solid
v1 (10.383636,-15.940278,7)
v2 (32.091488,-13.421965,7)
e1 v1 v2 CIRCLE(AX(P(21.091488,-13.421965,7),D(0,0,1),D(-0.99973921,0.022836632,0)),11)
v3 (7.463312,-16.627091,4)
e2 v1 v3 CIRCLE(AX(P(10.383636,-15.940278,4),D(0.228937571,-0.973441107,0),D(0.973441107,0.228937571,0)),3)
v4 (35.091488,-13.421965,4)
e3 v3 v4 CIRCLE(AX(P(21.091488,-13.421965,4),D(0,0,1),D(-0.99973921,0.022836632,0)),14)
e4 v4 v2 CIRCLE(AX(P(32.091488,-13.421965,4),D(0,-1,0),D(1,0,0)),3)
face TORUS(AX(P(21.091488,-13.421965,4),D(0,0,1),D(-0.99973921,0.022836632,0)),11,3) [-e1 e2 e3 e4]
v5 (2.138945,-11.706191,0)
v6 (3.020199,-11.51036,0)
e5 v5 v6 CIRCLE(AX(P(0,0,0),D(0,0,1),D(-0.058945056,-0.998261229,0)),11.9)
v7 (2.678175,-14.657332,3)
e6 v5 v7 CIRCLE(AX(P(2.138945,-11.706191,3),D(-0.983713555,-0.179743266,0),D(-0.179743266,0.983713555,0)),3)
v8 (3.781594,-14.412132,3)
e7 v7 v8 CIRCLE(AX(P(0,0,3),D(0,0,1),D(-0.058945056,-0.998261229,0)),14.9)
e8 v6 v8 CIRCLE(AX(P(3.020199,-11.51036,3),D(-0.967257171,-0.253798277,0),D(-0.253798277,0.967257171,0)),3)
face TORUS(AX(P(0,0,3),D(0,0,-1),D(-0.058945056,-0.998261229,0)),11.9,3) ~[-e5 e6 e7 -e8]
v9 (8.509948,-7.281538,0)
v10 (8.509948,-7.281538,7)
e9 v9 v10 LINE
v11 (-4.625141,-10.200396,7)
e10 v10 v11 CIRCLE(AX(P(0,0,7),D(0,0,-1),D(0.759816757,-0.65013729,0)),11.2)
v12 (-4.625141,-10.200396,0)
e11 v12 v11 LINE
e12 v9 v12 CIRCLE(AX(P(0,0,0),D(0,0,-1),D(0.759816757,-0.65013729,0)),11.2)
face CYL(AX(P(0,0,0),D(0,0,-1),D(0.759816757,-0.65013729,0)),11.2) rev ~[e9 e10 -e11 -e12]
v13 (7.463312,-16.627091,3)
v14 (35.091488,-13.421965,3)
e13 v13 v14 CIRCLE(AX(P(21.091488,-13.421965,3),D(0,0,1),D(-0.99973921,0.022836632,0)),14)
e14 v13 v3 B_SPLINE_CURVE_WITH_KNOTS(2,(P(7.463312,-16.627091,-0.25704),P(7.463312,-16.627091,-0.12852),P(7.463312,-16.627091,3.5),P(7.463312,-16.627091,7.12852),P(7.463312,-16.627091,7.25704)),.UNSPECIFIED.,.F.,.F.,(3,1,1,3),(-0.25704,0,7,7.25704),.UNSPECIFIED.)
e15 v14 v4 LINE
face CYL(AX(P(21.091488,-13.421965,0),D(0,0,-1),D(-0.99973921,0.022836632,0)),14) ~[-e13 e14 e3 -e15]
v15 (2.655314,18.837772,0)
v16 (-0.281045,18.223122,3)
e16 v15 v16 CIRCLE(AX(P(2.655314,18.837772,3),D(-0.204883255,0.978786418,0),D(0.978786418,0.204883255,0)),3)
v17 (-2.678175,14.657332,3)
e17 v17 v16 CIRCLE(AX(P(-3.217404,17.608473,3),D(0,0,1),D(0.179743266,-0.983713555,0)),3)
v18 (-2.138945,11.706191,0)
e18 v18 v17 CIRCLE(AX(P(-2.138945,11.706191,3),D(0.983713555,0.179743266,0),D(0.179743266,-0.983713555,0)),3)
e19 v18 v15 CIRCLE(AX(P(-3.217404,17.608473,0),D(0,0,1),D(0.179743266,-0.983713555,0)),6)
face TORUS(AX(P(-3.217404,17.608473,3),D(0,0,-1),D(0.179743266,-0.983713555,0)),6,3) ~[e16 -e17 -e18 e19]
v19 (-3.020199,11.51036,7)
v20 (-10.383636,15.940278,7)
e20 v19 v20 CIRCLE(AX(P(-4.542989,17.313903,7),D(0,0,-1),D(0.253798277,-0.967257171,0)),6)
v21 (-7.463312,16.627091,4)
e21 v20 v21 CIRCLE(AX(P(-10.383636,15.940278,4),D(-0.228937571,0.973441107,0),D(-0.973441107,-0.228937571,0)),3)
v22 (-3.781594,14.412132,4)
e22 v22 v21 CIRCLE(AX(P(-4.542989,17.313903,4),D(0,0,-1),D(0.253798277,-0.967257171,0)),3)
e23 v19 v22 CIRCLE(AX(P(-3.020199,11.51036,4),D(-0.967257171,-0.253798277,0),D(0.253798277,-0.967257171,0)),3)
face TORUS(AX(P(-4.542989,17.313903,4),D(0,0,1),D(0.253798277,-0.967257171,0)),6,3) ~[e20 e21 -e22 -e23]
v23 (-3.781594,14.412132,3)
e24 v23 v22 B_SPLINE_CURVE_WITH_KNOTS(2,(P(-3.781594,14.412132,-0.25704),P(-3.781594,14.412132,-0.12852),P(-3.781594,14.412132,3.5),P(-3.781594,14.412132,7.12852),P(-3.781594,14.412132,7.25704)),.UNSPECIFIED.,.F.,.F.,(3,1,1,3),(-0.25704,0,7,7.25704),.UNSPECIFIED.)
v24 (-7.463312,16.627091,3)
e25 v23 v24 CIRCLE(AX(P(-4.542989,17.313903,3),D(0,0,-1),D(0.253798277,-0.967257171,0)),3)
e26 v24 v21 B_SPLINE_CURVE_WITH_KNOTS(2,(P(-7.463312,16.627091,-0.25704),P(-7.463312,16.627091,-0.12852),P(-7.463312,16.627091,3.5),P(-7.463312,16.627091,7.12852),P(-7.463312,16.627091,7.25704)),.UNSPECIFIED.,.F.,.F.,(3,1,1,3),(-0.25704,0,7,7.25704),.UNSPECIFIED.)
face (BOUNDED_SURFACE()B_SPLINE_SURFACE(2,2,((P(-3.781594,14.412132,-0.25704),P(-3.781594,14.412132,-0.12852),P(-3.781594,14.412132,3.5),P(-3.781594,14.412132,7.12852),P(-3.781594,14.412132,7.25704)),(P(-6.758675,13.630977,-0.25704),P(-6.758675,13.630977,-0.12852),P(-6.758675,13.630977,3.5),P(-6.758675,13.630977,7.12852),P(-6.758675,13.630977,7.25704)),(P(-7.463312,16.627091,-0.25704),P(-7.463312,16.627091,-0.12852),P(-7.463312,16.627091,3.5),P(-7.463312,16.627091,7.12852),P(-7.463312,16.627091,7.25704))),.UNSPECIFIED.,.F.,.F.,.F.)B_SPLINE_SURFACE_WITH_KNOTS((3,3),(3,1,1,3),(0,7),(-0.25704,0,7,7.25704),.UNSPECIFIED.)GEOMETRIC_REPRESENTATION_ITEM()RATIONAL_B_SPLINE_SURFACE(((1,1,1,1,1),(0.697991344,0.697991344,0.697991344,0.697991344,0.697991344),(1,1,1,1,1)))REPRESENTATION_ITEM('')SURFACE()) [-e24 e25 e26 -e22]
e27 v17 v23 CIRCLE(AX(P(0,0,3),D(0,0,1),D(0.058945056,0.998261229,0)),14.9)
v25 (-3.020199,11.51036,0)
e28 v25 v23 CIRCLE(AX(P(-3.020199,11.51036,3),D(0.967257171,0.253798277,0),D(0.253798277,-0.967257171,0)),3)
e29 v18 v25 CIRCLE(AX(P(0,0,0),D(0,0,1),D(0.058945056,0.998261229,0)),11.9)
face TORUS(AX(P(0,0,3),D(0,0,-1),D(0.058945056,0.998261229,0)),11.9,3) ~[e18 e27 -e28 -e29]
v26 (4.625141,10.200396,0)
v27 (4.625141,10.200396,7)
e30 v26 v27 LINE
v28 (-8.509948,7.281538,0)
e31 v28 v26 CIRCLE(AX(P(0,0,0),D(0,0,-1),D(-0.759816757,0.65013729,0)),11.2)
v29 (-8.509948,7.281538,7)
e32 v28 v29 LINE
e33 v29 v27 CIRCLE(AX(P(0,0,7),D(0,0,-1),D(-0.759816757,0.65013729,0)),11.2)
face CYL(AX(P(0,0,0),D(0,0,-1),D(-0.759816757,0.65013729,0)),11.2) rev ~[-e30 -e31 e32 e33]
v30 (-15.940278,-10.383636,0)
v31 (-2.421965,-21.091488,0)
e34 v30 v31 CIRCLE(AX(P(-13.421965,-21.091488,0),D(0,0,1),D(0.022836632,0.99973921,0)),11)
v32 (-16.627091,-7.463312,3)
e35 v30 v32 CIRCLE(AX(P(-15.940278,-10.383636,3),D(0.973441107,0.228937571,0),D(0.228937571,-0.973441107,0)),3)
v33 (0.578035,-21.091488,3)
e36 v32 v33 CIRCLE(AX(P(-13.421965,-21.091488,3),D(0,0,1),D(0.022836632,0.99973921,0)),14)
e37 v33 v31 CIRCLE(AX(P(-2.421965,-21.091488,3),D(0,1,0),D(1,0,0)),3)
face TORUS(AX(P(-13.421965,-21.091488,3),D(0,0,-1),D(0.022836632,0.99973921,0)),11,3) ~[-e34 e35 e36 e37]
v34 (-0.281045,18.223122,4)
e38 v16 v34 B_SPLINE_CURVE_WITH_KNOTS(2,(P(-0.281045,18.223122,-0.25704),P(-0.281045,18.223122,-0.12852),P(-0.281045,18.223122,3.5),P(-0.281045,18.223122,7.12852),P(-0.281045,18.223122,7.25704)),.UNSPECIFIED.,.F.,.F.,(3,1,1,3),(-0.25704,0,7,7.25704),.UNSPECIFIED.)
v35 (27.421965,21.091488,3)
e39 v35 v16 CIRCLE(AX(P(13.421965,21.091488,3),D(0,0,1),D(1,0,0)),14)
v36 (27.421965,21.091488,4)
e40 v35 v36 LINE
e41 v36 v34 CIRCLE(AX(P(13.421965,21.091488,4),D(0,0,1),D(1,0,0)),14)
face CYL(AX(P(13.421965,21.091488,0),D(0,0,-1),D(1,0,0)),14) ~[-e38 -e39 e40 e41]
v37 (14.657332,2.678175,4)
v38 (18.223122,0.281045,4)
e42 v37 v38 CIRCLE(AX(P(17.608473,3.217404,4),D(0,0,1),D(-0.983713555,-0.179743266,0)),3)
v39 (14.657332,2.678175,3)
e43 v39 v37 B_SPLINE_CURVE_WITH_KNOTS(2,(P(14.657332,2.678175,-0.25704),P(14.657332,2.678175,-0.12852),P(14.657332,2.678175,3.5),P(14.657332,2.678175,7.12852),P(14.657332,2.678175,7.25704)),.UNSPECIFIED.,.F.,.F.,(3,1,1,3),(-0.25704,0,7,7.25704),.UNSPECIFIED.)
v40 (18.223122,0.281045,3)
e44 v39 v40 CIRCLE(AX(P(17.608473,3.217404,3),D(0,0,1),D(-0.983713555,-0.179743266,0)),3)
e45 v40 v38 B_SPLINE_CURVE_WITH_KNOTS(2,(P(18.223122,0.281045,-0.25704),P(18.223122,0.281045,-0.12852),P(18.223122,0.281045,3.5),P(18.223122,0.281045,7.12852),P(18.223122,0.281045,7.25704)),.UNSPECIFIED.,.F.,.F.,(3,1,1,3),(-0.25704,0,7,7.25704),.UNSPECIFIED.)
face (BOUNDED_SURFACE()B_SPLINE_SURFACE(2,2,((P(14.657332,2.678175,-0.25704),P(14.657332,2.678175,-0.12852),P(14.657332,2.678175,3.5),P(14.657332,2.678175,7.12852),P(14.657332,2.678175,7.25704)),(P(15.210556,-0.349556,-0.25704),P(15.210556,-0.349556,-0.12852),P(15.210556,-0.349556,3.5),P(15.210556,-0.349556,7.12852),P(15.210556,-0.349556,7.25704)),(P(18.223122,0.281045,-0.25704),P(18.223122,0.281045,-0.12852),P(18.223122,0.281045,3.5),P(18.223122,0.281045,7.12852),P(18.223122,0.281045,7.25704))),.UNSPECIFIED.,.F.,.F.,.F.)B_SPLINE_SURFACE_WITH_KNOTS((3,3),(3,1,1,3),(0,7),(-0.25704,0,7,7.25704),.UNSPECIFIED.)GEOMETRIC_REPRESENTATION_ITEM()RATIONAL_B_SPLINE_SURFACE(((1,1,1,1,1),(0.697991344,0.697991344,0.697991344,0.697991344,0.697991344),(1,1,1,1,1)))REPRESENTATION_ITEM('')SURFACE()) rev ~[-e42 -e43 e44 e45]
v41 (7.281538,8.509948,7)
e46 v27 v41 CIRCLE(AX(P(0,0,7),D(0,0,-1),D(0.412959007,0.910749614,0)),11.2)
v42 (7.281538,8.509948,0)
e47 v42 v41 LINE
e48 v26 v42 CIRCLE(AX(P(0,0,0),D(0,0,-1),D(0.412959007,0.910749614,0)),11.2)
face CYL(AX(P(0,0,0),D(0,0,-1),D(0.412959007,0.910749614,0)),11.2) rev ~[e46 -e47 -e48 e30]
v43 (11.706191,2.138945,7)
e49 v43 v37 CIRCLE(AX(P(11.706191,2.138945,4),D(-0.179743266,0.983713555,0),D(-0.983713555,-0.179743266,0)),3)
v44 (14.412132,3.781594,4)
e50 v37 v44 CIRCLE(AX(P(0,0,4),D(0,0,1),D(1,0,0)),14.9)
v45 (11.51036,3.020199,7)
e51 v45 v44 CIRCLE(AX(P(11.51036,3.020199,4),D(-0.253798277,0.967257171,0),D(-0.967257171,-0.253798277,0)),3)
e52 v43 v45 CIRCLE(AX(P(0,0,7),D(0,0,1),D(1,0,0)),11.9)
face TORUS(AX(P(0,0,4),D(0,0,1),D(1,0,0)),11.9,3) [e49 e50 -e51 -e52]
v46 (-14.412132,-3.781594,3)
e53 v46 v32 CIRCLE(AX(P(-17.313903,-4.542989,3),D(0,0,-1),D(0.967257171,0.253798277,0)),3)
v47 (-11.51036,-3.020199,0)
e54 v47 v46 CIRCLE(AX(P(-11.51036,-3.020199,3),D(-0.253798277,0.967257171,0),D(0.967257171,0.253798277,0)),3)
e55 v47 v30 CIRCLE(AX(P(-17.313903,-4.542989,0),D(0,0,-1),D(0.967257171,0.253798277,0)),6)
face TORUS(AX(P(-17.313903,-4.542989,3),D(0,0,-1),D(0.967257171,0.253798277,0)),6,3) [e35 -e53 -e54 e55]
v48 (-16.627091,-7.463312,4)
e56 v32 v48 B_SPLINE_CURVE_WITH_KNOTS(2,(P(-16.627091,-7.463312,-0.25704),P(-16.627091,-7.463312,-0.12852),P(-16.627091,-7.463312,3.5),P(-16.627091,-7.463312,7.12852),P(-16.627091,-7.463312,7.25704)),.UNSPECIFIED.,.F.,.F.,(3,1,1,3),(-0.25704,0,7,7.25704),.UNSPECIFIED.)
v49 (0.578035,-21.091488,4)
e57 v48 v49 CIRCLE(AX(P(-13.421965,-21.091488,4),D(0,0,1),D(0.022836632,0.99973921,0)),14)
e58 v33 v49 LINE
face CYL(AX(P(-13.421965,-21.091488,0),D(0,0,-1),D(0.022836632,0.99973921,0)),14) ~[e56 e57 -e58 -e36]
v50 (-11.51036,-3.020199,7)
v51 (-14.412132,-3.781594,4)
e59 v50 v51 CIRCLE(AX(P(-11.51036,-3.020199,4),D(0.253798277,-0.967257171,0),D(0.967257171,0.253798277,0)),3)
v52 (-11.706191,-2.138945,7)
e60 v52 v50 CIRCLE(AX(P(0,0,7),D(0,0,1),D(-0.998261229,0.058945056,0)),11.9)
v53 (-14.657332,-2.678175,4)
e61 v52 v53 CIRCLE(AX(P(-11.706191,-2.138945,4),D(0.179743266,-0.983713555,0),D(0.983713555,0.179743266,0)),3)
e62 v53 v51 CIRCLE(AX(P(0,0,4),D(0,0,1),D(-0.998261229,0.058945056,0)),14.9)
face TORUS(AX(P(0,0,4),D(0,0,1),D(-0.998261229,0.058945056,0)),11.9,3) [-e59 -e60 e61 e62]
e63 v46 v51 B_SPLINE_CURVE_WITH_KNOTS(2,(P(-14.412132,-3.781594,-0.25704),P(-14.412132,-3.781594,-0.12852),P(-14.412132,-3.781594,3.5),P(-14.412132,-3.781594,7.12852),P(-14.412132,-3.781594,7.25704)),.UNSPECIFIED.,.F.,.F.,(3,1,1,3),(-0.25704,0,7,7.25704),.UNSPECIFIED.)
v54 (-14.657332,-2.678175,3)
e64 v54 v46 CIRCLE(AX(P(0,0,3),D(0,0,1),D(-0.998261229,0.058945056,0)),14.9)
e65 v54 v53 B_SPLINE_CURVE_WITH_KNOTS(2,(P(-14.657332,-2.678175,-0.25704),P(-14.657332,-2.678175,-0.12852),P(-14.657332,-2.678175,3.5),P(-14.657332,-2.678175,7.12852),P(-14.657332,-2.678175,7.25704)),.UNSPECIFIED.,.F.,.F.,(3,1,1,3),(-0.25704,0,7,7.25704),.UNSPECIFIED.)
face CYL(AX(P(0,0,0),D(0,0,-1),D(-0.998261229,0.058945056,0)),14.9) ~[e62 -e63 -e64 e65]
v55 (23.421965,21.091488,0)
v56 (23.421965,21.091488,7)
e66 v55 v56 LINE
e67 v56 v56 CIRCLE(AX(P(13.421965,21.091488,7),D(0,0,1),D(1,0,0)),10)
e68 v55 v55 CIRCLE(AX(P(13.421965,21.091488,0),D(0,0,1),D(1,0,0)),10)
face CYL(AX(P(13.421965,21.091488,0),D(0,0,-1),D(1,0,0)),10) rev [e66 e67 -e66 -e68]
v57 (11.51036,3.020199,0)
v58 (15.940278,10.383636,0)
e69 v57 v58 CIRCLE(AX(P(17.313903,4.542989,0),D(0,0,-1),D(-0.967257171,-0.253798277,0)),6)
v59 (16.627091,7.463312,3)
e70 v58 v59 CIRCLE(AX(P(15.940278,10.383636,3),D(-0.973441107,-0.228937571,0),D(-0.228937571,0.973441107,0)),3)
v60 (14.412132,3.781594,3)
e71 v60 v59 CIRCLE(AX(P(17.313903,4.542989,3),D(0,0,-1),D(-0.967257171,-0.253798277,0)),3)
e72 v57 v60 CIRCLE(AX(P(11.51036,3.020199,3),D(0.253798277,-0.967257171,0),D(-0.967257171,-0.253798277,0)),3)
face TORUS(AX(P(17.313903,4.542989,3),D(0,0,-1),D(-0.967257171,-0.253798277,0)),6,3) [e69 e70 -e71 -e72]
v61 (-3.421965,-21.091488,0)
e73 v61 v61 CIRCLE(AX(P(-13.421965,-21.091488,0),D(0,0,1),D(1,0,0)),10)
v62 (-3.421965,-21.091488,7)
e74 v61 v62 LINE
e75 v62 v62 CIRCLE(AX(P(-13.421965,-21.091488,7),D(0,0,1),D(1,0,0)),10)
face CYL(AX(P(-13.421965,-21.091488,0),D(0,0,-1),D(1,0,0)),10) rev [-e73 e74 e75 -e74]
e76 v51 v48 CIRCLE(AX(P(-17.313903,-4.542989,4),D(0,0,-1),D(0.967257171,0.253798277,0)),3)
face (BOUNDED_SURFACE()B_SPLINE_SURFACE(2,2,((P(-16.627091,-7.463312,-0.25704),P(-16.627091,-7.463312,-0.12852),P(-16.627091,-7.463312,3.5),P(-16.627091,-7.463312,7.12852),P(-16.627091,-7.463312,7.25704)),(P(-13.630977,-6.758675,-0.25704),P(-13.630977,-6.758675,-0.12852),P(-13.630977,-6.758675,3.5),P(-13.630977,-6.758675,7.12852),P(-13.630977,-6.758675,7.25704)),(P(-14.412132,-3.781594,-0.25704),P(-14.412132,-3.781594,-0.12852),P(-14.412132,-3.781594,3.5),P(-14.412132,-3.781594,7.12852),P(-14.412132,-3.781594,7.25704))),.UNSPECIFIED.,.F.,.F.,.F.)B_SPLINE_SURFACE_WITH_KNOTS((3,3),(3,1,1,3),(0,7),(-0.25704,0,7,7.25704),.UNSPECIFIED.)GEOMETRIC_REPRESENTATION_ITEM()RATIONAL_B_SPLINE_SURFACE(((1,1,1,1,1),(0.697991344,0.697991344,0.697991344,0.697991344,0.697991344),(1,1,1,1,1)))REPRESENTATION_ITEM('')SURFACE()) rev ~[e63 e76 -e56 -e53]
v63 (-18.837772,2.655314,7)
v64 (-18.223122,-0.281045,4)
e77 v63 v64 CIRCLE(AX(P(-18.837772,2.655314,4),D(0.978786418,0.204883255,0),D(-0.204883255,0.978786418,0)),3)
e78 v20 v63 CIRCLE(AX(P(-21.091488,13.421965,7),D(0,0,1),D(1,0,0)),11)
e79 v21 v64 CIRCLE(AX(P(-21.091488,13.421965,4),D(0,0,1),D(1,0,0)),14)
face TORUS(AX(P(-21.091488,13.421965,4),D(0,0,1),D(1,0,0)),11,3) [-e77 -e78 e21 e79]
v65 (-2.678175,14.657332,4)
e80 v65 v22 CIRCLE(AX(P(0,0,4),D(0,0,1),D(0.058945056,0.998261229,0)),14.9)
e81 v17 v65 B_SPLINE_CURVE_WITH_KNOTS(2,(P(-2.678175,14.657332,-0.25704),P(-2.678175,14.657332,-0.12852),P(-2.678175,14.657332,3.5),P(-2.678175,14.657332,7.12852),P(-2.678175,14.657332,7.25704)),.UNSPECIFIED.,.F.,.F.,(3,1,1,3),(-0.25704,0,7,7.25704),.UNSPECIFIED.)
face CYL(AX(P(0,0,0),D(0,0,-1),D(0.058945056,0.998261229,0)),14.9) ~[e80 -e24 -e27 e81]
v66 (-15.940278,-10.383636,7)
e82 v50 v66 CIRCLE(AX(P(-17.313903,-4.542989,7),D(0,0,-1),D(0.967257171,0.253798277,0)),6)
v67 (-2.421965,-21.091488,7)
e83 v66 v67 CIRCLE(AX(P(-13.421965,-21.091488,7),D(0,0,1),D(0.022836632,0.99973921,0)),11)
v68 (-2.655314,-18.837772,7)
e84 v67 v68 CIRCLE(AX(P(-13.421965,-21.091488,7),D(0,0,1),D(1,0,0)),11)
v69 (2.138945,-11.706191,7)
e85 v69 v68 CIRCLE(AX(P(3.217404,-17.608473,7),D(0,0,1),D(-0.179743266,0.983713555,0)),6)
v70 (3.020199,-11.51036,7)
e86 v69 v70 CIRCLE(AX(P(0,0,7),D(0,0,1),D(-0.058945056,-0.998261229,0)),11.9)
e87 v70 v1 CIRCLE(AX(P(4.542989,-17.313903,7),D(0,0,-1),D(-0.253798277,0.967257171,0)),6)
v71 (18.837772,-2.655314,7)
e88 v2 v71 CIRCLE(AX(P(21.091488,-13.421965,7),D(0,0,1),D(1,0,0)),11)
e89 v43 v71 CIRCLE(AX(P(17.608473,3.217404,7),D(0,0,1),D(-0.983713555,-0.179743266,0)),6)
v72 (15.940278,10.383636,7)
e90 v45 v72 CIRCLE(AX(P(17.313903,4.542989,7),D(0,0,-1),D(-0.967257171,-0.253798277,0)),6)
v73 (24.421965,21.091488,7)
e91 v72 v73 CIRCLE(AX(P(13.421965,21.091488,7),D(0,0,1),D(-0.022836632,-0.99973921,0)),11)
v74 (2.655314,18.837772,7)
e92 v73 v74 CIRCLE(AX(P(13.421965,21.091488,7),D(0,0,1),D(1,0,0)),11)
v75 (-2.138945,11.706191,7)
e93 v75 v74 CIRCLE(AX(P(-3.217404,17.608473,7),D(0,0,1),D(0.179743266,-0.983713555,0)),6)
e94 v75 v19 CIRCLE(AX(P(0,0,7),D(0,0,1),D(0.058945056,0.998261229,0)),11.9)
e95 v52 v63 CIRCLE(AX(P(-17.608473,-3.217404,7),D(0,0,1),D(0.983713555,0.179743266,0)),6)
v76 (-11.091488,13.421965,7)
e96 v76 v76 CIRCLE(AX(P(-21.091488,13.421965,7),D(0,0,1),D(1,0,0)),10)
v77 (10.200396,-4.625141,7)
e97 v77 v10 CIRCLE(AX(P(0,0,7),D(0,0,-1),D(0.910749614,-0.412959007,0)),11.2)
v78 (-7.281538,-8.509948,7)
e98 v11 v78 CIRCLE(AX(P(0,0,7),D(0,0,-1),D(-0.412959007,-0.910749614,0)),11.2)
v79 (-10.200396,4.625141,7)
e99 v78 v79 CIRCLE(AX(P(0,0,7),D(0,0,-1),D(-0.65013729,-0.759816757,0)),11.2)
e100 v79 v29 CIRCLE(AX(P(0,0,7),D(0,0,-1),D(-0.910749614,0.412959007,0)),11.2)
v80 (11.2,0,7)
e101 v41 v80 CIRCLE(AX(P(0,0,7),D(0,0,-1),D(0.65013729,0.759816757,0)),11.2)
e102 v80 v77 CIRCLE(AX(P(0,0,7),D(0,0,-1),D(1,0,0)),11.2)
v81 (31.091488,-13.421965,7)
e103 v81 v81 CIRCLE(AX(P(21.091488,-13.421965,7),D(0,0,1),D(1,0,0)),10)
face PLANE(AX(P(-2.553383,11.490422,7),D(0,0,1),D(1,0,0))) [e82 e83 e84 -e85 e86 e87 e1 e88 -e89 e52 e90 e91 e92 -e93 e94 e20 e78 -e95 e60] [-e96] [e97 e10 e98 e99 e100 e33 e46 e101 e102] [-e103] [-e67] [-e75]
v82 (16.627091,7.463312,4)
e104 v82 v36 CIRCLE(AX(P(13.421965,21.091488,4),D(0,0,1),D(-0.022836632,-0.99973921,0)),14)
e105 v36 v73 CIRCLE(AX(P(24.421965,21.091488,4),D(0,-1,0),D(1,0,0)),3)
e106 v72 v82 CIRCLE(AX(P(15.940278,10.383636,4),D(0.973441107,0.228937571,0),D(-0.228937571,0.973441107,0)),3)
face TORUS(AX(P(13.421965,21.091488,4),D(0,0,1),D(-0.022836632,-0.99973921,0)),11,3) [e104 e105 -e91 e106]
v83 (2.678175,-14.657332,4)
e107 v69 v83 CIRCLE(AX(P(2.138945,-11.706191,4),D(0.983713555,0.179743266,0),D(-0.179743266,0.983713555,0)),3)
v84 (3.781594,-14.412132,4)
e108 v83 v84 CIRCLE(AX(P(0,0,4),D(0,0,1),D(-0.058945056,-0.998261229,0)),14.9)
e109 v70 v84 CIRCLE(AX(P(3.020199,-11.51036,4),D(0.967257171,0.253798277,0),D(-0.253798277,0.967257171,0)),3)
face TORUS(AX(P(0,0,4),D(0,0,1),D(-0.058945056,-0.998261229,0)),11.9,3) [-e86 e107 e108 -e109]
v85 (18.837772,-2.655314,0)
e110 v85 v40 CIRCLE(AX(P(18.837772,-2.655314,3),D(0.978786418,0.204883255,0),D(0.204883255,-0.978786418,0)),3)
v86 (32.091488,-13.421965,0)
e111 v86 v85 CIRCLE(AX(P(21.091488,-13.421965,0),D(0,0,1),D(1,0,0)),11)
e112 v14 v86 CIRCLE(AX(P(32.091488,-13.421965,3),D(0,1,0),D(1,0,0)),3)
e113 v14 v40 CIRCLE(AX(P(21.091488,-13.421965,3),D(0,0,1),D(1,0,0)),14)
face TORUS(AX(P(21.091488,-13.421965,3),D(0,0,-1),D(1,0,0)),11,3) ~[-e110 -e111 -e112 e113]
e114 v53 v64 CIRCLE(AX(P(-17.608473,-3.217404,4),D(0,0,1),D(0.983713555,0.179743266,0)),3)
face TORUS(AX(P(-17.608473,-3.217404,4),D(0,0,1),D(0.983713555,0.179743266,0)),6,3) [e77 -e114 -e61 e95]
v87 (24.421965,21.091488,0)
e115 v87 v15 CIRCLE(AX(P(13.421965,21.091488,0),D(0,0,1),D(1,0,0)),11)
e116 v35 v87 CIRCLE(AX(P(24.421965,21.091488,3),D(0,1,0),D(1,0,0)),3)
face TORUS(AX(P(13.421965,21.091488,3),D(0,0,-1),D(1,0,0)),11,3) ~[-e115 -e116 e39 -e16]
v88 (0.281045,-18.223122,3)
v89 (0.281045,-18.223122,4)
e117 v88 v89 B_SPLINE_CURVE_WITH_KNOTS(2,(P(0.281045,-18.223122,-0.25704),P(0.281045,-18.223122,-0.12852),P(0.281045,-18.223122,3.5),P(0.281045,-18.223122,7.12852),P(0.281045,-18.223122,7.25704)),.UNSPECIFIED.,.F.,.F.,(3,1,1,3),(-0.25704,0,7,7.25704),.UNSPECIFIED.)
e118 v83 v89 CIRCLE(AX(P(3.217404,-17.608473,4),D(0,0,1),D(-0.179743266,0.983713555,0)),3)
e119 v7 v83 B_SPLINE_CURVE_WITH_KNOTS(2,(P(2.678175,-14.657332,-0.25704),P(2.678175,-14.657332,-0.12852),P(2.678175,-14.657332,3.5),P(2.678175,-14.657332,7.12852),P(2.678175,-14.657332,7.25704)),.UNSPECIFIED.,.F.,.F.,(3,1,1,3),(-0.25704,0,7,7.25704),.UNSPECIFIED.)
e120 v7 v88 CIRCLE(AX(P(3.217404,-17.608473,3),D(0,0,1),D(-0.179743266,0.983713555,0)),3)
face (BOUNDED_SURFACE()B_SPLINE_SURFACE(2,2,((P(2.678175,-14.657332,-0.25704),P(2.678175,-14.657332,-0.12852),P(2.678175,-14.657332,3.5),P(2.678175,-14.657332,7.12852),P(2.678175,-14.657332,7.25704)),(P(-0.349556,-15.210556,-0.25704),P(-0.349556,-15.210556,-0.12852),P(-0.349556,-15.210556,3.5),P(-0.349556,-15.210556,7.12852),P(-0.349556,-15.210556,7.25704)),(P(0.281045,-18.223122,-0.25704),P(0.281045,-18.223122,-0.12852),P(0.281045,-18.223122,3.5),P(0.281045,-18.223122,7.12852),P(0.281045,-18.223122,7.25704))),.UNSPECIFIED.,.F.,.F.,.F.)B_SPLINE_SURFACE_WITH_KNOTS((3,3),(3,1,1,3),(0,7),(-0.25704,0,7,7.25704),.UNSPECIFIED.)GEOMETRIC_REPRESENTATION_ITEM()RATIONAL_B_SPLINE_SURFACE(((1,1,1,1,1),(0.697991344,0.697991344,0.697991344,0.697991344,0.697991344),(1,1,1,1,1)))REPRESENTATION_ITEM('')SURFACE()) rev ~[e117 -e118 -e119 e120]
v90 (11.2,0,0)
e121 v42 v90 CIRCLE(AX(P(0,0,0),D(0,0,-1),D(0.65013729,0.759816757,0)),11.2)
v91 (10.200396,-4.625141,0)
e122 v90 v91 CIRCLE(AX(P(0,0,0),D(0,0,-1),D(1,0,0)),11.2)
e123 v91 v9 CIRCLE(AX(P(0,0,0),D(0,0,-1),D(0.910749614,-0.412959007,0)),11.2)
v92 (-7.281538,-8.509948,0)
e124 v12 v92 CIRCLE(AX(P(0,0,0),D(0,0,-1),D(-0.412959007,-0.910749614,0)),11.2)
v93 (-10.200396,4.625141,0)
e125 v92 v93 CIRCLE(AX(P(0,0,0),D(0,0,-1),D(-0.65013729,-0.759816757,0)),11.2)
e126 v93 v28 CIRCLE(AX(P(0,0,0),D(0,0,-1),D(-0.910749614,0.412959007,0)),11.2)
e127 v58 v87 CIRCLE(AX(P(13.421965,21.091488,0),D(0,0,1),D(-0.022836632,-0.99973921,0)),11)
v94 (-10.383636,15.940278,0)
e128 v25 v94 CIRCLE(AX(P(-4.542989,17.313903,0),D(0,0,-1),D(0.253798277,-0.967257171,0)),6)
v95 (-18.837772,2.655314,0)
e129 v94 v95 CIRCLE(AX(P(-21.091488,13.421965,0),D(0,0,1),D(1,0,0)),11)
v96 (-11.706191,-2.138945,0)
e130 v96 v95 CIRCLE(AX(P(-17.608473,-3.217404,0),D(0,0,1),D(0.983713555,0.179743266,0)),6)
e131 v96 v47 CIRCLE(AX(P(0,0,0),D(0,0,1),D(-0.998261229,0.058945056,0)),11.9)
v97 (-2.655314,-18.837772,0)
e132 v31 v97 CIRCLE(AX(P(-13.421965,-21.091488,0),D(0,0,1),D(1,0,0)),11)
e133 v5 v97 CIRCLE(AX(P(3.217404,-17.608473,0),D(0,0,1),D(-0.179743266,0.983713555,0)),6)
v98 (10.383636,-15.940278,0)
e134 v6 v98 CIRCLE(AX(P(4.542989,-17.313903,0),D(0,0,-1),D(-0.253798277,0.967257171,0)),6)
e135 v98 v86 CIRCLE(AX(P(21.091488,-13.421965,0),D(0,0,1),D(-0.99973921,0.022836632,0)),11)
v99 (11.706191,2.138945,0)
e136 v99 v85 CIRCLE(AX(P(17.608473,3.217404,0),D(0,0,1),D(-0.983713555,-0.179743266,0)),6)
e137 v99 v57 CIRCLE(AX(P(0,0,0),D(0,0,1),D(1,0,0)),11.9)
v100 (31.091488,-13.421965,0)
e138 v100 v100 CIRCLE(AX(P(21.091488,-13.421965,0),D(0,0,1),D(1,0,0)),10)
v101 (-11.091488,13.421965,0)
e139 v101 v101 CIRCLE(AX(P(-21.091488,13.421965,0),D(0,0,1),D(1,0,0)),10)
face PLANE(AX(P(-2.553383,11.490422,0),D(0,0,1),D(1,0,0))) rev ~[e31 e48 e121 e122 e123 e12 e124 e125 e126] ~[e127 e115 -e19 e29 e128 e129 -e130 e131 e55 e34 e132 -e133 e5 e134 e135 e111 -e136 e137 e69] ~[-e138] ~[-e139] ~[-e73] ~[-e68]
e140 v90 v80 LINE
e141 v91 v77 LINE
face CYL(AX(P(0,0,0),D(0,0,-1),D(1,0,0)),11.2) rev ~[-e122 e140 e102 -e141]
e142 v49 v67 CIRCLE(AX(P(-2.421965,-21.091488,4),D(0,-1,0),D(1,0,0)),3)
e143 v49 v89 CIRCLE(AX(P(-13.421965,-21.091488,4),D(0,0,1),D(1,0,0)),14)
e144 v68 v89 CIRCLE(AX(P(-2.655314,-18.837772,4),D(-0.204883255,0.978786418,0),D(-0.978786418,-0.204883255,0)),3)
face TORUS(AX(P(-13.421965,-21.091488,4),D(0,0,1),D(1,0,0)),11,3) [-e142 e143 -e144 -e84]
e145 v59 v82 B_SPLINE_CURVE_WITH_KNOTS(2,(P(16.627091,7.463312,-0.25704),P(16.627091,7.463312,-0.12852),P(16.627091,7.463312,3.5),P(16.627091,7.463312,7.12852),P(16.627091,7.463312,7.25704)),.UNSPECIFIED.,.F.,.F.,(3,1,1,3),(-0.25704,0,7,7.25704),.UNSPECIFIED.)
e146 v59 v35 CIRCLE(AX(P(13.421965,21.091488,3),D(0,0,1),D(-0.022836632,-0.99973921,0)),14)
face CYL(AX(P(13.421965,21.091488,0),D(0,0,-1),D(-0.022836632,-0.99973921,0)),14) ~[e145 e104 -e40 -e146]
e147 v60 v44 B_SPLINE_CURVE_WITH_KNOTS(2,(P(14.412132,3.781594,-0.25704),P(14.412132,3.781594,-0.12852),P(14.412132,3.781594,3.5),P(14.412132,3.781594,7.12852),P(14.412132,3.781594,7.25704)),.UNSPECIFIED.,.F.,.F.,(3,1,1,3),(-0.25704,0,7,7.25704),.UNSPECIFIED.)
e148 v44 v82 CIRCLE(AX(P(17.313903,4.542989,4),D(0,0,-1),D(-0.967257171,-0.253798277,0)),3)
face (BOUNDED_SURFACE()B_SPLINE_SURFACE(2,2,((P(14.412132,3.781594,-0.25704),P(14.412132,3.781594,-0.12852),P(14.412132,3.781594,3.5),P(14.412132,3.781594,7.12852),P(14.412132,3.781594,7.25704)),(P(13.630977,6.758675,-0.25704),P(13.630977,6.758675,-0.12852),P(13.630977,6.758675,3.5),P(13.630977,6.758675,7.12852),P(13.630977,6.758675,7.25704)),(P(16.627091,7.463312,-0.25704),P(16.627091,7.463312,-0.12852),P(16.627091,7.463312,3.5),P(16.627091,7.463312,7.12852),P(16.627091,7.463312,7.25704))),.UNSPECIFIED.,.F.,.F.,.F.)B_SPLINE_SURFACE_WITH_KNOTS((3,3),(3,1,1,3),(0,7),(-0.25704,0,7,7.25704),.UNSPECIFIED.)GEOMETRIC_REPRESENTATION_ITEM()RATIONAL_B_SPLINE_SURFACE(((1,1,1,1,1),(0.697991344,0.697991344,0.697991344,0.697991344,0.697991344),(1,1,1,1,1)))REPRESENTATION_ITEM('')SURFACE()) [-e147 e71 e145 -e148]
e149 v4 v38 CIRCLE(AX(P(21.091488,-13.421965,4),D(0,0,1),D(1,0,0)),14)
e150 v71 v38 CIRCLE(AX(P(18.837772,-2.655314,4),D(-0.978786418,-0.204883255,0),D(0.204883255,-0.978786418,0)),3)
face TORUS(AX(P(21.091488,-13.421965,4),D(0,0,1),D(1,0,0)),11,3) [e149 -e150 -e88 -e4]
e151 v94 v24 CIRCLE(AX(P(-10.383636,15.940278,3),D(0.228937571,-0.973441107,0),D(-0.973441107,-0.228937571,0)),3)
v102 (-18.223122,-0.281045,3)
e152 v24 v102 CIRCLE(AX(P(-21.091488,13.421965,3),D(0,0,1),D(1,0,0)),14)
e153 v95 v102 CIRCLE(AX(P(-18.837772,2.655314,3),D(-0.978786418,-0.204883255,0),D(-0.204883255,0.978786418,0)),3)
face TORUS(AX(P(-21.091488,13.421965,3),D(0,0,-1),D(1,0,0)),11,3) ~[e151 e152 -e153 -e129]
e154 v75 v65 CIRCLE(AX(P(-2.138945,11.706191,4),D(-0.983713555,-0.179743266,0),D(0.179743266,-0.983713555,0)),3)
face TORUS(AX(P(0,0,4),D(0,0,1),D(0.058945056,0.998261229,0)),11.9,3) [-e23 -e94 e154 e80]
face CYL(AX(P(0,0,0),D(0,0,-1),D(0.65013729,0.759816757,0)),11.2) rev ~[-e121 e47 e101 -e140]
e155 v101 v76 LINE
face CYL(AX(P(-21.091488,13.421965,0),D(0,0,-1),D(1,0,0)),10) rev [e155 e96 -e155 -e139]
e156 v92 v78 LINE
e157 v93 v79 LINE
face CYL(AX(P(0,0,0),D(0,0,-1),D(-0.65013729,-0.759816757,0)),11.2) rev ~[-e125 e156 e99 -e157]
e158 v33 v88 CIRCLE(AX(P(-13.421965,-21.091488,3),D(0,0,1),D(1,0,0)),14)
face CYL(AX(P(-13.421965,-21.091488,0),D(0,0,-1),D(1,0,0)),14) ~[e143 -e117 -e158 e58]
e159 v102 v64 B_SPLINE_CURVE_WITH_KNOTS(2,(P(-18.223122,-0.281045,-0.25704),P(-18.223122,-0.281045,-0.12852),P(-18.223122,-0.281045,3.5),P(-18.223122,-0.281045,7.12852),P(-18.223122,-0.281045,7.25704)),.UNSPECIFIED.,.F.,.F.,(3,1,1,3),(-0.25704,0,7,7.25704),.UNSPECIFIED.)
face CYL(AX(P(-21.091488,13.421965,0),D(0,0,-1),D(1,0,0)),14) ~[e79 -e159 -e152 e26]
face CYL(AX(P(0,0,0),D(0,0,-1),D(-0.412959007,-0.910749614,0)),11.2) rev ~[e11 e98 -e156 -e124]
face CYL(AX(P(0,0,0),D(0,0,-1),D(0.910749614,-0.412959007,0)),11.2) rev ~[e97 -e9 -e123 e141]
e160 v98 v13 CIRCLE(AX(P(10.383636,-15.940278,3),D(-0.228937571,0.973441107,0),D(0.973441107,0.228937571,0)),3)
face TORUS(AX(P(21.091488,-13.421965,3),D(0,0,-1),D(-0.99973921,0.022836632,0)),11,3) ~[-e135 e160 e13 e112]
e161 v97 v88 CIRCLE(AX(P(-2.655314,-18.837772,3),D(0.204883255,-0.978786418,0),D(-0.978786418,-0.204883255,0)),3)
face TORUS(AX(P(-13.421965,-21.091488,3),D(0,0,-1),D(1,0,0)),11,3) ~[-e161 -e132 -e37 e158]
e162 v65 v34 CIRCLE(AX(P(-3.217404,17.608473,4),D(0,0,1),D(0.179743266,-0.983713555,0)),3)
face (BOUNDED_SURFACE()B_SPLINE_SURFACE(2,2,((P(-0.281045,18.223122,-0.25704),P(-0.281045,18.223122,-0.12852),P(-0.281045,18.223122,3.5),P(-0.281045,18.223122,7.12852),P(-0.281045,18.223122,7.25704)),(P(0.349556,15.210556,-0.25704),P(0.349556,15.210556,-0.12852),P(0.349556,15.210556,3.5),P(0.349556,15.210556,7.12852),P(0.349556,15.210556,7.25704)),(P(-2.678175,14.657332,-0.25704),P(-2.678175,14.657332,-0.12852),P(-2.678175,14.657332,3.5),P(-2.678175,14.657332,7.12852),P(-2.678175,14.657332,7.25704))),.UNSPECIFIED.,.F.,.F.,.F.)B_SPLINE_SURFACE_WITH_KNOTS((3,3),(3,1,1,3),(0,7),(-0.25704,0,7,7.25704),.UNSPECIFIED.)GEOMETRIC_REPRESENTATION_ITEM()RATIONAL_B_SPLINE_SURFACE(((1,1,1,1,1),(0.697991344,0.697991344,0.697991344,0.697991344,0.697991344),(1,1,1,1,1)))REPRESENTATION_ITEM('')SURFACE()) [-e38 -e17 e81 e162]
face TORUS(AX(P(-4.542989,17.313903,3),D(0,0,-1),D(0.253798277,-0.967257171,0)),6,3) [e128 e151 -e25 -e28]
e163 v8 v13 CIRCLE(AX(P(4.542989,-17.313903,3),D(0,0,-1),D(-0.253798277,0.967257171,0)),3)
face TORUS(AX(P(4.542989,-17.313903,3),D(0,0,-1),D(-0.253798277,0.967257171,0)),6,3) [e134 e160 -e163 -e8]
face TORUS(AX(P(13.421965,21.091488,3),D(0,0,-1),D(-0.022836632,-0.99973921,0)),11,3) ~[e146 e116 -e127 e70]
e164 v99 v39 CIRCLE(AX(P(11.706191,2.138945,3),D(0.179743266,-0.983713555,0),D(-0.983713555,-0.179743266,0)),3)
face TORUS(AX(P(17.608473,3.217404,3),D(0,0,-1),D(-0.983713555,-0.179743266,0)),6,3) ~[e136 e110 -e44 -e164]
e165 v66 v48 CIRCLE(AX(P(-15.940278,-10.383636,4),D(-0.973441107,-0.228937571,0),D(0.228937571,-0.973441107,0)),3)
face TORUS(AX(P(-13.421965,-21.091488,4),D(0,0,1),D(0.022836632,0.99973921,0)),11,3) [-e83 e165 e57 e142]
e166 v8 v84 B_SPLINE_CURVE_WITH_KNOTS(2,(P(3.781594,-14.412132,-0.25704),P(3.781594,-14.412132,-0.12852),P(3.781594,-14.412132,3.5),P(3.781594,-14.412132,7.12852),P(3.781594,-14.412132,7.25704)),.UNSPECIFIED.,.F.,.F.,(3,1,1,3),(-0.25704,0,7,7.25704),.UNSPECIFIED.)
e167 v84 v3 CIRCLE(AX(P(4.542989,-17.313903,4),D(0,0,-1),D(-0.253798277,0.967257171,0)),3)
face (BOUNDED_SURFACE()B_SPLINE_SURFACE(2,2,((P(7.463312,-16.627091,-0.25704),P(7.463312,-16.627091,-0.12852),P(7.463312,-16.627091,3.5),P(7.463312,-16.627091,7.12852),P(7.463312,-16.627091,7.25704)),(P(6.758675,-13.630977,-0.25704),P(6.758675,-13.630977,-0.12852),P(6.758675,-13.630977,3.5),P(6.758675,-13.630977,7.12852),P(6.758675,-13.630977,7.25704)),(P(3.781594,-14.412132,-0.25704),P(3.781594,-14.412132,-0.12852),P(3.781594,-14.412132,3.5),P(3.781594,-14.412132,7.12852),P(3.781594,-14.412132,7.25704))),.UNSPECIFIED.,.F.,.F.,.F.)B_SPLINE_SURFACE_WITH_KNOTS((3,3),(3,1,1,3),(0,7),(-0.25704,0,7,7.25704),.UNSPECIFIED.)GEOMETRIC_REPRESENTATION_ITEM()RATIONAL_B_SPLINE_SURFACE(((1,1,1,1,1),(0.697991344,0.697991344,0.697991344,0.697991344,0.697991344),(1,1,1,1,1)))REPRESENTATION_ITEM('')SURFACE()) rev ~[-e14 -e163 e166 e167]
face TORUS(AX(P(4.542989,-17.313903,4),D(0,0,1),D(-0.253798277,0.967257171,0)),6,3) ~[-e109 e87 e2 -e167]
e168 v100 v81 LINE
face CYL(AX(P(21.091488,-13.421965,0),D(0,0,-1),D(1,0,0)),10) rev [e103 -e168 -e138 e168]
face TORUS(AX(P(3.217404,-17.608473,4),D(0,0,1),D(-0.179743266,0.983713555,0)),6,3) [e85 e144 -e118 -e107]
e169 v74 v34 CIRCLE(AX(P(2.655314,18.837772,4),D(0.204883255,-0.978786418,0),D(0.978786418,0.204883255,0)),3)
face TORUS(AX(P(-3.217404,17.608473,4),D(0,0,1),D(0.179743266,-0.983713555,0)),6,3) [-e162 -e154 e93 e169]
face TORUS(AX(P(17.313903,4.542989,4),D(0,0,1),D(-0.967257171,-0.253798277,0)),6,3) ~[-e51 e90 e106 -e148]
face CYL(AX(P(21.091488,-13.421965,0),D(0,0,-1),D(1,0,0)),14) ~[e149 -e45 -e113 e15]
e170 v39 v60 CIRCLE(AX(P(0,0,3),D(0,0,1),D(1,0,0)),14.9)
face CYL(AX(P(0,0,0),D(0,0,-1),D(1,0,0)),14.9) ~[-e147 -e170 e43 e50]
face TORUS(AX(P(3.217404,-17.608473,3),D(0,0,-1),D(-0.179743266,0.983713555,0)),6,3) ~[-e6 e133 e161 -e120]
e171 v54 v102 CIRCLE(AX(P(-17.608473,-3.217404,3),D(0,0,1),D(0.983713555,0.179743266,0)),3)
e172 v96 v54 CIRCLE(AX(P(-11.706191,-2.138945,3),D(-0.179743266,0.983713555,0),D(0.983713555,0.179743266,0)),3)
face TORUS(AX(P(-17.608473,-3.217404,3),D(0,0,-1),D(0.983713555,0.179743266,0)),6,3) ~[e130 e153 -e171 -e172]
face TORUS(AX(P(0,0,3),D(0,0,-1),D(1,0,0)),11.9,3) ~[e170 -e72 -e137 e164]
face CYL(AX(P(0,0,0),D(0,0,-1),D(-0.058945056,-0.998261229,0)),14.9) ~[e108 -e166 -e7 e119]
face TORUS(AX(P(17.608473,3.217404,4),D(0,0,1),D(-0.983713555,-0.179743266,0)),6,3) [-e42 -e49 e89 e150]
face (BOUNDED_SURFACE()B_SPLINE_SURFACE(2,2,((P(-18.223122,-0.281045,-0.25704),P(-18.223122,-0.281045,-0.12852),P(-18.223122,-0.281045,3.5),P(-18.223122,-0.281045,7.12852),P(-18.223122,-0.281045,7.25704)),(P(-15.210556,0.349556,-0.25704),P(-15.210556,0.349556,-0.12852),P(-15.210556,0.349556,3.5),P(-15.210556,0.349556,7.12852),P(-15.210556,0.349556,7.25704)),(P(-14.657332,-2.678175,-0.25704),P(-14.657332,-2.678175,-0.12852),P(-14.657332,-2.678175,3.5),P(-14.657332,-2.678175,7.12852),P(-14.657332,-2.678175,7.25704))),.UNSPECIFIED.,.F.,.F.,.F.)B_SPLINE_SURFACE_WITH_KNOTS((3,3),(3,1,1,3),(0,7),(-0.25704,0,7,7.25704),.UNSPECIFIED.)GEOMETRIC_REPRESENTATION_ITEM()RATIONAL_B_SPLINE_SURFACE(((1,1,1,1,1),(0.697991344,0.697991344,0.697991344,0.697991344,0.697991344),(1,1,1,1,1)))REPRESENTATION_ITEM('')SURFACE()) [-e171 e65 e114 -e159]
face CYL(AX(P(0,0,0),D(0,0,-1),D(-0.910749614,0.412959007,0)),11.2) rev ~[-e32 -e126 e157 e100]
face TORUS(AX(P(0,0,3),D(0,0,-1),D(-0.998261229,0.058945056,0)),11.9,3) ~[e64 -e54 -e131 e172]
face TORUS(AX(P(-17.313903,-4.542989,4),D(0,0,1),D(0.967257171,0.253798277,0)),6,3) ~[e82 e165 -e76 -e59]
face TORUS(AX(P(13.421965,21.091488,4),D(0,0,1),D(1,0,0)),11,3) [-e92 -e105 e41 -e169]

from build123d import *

# Parameters (mm, degrees)
F0_R     = 10
F1_DEPTH = 7
F2_R     = 3


with BuildPart() as f1:
    # F0 (on Top) → F1 (new body)
    with BuildSketch(Plane.XY):
        with BuildLine():
            ThreePointArc((-8.5099476782, 7.2815376477), (-2.4295810376, 10.9333039829), (4.6251408746, 10.2003956732))
            ThreePointArc((4.6251408746, 10.2003956732), (2.4988162565, 12.3345005205), (0.87828133, 14.8740923053))
            ThreePointArc((0.87828133, 14.8740923053), (-3.2322104876, 14.5451990486), (-7.0951390366, 13.1022517932))
            ThreePointArc((-7.0951390366, 13.1022517932), (-7.4875831187, 10.1153390855), (-8.5099476782, 7.2815376477))
        make_face()
        with BuildLine():
            ThreePointArc((4.6251408746, 10.2003956732), (6.0130401599, 9.4489866142), (7.2815376477, 8.5099476782))
            ThreePointArc((7.2815376477, 8.5099476782), (10.1153390855, 7.4875831187), (13.1022517932, 7.0951390366))
            ThreePointArc((13.1022517932, 7.0951390366), (7.999490927, 12.570526835), (0.87828133, 14.8740923053))
            ThreePointArc((0.87828133, 14.8740923053), (2.4988162565, 12.3345005205), (4.6251408746, 10.2003956732))
        make_face()
        with BuildLine():
            ThreePointArc((7.2815376477, 8.5099476782), (10.1733284046, 4.6843771382), (11.2, 0))
            ThreePointArc((11.2, 0), (10.9472469493, -2.3659637001), (10.2003956732, -4.6251408746))
            ThreePointArc((10.2003956732, -4.6251408746), (12.3345005205, -2.4988162565), (14.8740923053, -0.87828133))
            ThreePointArc((14.8740923053, -0.87828133), (14.893521668, -0.4393316809), (14.9, 0))
            ThreePointArc((14.9, 0), (14.4435721295, 3.6596754147), (13.1022517932, 7.0951390366))
            ThreePointArc((13.1022517932, 7.0951390366), (10.1153390855, 7.4875831187), (7.2815376477, 8.5099476782))
        make_face()
        with BuildLine():
            ThreePointArc((-10.2003956732, 4.6251408746), (-9.4489866142, 6.0130401599), (-8.5099476782, 7.2815376477))
            ThreePointArc((-8.5099476782, 7.2815376477), (-7.4875831187, 10.1153390855), (-7.0951390366, 13.1022517932))
            ThreePointArc((-7.0951390366, 13.1022517932), (-12.570526835, 7.999490927), (-14.8740923053, 0.87828133))
            ThreePointArc((-14.8740923053, 0.87828133), (-12.3345005205, 2.4988162565), (-10.2003956732, 4.6251408746))
        make_face()
        with BuildLine():
            ThreePointArc((-14.8740923053, 0.87828133), (-12.570526835, 7.999490927), (-7.0951390366, 13.1022517932))
            ThreePointArc((-7.0951390366, 13.1022517932), (-7.0924007725, 13.2620977947), (-7.0914879781, 13.4219646426))
            ThreePointArc((-7.0914879781, 13.4219646426), (-32.9877802455, 20.8029015947), (-14.8740923053, 0.87828133))
        make_face()
        with Locations((-21.0914879781, 13.4219646426)):
            Circle(F0_R, mode=Mode.SUBTRACT)
        with BuildLine():
            ThreePointArc((-7.2815376477, -8.5099476782), (-10.9333039829, -2.4295810376), (-10.2003956732, 4.6251408746))
            ThreePointArc((-10.2003956732, 4.6251408746), (-12.3345005205, 2.4988162565), (-14.8740923053, 0.87828133))
            ThreePointArc((-14.8740923053, 0.87828133), (-14.5451990486, -3.2322104876), (-13.1022517932, -7.0951390366))
            ThreePointArc((-13.1022517932, -7.0951390366), (-10.1153390855, -7.4875831187), (-7.2815376477, -8.5099476782))
        make_face()
        with BuildLine():
            ThreePointArc((0.5780353574, -21.0914879781), (0.2090948609, -17.8986496152), (-0.87828133, -14.8740923053))
            ThreePointArc((-0.87828133, -14.8740923053), (-7.999490927, -12.570526835), (-13.1022517932, -7.0951390366))
            ThreePointArc((-13.1022517932, -7.0951390366), (-23.4338570685, -30.8772945394), (0.5780353574, -21.0914879781))
        make_face()
        with Locations((-13.4219646426, -21.0914879781)):
            Circle(F0_R, mode=Mode.SUBTRACT)
        with BuildLine():
            ThreePointArc((-0.87828133, -14.8740923053), (-2.4988162565, -12.3345005205), (-4.6251408746, -10.2003956732))
            ThreePointArc((-4.6251408746, -10.2003956732), (-6.0130401599, -9.4489866142), (-7.2815376477, -8.5099476782))
            ThreePointArc((-7.2815376477, -8.5099476782), (-10.1153390855, -7.4875831187), (-13.1022517932, -7.0951390366))
            ThreePointArc((-13.1022517932, -7.0951390366), (-7.999490927, -12.570526835), (-0.87828133, -14.8740923053))
        make_face()
        with BuildLine():
            ThreePointArc((7.0951390366, -13.1022517932), (7.4875831187, -10.1153390855), (8.5099476782, -7.2815376477))
            ThreePointArc((8.5099476782, -7.2815376477), (2.4295810376, -10.9333039829), (-4.6251408746, -10.2003956732))
            ThreePointArc((-4.6251408746, -10.2003956732), (-2.4988162565, -12.3345005205), (-0.87828133, -14.8740923053))
            ThreePointArc((-0.87828133, -14.8740923053), (3.2322104876, -14.5451990486), (7.0951390366, -13.1022517932))
        make_face()
        with BuildLine():
            ThreePointArc((14.8740923053, -0.87828133), (12.3345005205, -2.4988162565), (10.2003956732, -4.6251408746))
            ThreePointArc((10.2003956732, -4.6251408746), (9.4489866142, -6.0130401599), (8.5099476782, -7.2815376477))
            ThreePointArc((8.5099476782, -7.2815376477), (7.4875831187, -10.1153390855), (7.0951390366, -13.1022517932))
            ThreePointArc((7.0951390366, -13.1022517932), (12.570526835, -7.999490927), (14.8740923053, -0.87828133))
        make_face()
        with BuildLine():
            ThreePointArc((35.0914879781, -13.4219646426), (28.4724249302, -1.5256723753), (14.8740923053, -0.87828133))
            ThreePointArc((14.8740923053, -0.87828133), (12.570526835, -7.999490927), (7.0951390366, -13.1022517932))
            ThreePointArc((7.0951390366, -13.1022517932), (20.9316211301, -27.4210518483), (35.0914879781, -13.4219646426))
        make_face()
        with Locations((21.0914879781, -13.4219646426)):
            Circle(F0_R, mode=Mode.SUBTRACT)
        with BuildLine():
            ThreePointArc((0.87828133, 14.8740923053), (7.999490927, 12.570526835), (13.1022517932, 7.0951390366))
            ThreePointArc((13.1022517932, 7.0951390366), (23.2077712039, 11.0795955523), (27.4219646426, 21.0914879781))
            ThreePointArc((27.4219646426, 21.0914879781), (10.2291262797, 34.7225474816), (0.87828133, 14.8740923053))
        make_face()
        with Locations((13.4219646426, 21.0914879781)):
            Circle(F0_R, mode=Mode.SUBTRACT)
    extrude(amount=F1_DEPTH)

    # F2
    f2_edges = [f1.edges().sort_by_distance(p)[0] for p in [
        (-20.938265, -32.902721, 0),
        (32.902721, -20.938265, 0),
        (20.938265, 32.902721, 0),
        (-32.902721, 20.938265, 0),
        (20.938265, 32.902721, 7),
        (-32.902721, 20.938265, 7),
        (-20.938265, -32.902721, 7),
        (32.902721, -20.938265, 7),
        (-14.874092, 0.878281, 3.5),
        (-13.102252, -7.095139, 3.5),
        (-14.545199, -3.23221, 0),
        (-14.545199, -3.23221, 7),
        (0.878281, 14.874092, 3.5),
        (-7.095139, 13.102252, 3.5),
        (-3.23221, 14.545199, 0),
        (-3.23221, 14.545199, 7),
        (-0.878281, -14.874092, 3.5),
        (7.095139, -13.102252, 3.5),
        (3.23221, -14.545199, 0),
        (3.23221, -14.545199, 7),
        (14.874092, -0.878281, 3.5),
        (13.102252, 7.095139, 3.5),
        (14.545199, 3.23221, 0),
        (14.545199, 3.23221, 7),
    ]]
    fillet(f2_edges, radius=F2_R)


solid = f1.part
